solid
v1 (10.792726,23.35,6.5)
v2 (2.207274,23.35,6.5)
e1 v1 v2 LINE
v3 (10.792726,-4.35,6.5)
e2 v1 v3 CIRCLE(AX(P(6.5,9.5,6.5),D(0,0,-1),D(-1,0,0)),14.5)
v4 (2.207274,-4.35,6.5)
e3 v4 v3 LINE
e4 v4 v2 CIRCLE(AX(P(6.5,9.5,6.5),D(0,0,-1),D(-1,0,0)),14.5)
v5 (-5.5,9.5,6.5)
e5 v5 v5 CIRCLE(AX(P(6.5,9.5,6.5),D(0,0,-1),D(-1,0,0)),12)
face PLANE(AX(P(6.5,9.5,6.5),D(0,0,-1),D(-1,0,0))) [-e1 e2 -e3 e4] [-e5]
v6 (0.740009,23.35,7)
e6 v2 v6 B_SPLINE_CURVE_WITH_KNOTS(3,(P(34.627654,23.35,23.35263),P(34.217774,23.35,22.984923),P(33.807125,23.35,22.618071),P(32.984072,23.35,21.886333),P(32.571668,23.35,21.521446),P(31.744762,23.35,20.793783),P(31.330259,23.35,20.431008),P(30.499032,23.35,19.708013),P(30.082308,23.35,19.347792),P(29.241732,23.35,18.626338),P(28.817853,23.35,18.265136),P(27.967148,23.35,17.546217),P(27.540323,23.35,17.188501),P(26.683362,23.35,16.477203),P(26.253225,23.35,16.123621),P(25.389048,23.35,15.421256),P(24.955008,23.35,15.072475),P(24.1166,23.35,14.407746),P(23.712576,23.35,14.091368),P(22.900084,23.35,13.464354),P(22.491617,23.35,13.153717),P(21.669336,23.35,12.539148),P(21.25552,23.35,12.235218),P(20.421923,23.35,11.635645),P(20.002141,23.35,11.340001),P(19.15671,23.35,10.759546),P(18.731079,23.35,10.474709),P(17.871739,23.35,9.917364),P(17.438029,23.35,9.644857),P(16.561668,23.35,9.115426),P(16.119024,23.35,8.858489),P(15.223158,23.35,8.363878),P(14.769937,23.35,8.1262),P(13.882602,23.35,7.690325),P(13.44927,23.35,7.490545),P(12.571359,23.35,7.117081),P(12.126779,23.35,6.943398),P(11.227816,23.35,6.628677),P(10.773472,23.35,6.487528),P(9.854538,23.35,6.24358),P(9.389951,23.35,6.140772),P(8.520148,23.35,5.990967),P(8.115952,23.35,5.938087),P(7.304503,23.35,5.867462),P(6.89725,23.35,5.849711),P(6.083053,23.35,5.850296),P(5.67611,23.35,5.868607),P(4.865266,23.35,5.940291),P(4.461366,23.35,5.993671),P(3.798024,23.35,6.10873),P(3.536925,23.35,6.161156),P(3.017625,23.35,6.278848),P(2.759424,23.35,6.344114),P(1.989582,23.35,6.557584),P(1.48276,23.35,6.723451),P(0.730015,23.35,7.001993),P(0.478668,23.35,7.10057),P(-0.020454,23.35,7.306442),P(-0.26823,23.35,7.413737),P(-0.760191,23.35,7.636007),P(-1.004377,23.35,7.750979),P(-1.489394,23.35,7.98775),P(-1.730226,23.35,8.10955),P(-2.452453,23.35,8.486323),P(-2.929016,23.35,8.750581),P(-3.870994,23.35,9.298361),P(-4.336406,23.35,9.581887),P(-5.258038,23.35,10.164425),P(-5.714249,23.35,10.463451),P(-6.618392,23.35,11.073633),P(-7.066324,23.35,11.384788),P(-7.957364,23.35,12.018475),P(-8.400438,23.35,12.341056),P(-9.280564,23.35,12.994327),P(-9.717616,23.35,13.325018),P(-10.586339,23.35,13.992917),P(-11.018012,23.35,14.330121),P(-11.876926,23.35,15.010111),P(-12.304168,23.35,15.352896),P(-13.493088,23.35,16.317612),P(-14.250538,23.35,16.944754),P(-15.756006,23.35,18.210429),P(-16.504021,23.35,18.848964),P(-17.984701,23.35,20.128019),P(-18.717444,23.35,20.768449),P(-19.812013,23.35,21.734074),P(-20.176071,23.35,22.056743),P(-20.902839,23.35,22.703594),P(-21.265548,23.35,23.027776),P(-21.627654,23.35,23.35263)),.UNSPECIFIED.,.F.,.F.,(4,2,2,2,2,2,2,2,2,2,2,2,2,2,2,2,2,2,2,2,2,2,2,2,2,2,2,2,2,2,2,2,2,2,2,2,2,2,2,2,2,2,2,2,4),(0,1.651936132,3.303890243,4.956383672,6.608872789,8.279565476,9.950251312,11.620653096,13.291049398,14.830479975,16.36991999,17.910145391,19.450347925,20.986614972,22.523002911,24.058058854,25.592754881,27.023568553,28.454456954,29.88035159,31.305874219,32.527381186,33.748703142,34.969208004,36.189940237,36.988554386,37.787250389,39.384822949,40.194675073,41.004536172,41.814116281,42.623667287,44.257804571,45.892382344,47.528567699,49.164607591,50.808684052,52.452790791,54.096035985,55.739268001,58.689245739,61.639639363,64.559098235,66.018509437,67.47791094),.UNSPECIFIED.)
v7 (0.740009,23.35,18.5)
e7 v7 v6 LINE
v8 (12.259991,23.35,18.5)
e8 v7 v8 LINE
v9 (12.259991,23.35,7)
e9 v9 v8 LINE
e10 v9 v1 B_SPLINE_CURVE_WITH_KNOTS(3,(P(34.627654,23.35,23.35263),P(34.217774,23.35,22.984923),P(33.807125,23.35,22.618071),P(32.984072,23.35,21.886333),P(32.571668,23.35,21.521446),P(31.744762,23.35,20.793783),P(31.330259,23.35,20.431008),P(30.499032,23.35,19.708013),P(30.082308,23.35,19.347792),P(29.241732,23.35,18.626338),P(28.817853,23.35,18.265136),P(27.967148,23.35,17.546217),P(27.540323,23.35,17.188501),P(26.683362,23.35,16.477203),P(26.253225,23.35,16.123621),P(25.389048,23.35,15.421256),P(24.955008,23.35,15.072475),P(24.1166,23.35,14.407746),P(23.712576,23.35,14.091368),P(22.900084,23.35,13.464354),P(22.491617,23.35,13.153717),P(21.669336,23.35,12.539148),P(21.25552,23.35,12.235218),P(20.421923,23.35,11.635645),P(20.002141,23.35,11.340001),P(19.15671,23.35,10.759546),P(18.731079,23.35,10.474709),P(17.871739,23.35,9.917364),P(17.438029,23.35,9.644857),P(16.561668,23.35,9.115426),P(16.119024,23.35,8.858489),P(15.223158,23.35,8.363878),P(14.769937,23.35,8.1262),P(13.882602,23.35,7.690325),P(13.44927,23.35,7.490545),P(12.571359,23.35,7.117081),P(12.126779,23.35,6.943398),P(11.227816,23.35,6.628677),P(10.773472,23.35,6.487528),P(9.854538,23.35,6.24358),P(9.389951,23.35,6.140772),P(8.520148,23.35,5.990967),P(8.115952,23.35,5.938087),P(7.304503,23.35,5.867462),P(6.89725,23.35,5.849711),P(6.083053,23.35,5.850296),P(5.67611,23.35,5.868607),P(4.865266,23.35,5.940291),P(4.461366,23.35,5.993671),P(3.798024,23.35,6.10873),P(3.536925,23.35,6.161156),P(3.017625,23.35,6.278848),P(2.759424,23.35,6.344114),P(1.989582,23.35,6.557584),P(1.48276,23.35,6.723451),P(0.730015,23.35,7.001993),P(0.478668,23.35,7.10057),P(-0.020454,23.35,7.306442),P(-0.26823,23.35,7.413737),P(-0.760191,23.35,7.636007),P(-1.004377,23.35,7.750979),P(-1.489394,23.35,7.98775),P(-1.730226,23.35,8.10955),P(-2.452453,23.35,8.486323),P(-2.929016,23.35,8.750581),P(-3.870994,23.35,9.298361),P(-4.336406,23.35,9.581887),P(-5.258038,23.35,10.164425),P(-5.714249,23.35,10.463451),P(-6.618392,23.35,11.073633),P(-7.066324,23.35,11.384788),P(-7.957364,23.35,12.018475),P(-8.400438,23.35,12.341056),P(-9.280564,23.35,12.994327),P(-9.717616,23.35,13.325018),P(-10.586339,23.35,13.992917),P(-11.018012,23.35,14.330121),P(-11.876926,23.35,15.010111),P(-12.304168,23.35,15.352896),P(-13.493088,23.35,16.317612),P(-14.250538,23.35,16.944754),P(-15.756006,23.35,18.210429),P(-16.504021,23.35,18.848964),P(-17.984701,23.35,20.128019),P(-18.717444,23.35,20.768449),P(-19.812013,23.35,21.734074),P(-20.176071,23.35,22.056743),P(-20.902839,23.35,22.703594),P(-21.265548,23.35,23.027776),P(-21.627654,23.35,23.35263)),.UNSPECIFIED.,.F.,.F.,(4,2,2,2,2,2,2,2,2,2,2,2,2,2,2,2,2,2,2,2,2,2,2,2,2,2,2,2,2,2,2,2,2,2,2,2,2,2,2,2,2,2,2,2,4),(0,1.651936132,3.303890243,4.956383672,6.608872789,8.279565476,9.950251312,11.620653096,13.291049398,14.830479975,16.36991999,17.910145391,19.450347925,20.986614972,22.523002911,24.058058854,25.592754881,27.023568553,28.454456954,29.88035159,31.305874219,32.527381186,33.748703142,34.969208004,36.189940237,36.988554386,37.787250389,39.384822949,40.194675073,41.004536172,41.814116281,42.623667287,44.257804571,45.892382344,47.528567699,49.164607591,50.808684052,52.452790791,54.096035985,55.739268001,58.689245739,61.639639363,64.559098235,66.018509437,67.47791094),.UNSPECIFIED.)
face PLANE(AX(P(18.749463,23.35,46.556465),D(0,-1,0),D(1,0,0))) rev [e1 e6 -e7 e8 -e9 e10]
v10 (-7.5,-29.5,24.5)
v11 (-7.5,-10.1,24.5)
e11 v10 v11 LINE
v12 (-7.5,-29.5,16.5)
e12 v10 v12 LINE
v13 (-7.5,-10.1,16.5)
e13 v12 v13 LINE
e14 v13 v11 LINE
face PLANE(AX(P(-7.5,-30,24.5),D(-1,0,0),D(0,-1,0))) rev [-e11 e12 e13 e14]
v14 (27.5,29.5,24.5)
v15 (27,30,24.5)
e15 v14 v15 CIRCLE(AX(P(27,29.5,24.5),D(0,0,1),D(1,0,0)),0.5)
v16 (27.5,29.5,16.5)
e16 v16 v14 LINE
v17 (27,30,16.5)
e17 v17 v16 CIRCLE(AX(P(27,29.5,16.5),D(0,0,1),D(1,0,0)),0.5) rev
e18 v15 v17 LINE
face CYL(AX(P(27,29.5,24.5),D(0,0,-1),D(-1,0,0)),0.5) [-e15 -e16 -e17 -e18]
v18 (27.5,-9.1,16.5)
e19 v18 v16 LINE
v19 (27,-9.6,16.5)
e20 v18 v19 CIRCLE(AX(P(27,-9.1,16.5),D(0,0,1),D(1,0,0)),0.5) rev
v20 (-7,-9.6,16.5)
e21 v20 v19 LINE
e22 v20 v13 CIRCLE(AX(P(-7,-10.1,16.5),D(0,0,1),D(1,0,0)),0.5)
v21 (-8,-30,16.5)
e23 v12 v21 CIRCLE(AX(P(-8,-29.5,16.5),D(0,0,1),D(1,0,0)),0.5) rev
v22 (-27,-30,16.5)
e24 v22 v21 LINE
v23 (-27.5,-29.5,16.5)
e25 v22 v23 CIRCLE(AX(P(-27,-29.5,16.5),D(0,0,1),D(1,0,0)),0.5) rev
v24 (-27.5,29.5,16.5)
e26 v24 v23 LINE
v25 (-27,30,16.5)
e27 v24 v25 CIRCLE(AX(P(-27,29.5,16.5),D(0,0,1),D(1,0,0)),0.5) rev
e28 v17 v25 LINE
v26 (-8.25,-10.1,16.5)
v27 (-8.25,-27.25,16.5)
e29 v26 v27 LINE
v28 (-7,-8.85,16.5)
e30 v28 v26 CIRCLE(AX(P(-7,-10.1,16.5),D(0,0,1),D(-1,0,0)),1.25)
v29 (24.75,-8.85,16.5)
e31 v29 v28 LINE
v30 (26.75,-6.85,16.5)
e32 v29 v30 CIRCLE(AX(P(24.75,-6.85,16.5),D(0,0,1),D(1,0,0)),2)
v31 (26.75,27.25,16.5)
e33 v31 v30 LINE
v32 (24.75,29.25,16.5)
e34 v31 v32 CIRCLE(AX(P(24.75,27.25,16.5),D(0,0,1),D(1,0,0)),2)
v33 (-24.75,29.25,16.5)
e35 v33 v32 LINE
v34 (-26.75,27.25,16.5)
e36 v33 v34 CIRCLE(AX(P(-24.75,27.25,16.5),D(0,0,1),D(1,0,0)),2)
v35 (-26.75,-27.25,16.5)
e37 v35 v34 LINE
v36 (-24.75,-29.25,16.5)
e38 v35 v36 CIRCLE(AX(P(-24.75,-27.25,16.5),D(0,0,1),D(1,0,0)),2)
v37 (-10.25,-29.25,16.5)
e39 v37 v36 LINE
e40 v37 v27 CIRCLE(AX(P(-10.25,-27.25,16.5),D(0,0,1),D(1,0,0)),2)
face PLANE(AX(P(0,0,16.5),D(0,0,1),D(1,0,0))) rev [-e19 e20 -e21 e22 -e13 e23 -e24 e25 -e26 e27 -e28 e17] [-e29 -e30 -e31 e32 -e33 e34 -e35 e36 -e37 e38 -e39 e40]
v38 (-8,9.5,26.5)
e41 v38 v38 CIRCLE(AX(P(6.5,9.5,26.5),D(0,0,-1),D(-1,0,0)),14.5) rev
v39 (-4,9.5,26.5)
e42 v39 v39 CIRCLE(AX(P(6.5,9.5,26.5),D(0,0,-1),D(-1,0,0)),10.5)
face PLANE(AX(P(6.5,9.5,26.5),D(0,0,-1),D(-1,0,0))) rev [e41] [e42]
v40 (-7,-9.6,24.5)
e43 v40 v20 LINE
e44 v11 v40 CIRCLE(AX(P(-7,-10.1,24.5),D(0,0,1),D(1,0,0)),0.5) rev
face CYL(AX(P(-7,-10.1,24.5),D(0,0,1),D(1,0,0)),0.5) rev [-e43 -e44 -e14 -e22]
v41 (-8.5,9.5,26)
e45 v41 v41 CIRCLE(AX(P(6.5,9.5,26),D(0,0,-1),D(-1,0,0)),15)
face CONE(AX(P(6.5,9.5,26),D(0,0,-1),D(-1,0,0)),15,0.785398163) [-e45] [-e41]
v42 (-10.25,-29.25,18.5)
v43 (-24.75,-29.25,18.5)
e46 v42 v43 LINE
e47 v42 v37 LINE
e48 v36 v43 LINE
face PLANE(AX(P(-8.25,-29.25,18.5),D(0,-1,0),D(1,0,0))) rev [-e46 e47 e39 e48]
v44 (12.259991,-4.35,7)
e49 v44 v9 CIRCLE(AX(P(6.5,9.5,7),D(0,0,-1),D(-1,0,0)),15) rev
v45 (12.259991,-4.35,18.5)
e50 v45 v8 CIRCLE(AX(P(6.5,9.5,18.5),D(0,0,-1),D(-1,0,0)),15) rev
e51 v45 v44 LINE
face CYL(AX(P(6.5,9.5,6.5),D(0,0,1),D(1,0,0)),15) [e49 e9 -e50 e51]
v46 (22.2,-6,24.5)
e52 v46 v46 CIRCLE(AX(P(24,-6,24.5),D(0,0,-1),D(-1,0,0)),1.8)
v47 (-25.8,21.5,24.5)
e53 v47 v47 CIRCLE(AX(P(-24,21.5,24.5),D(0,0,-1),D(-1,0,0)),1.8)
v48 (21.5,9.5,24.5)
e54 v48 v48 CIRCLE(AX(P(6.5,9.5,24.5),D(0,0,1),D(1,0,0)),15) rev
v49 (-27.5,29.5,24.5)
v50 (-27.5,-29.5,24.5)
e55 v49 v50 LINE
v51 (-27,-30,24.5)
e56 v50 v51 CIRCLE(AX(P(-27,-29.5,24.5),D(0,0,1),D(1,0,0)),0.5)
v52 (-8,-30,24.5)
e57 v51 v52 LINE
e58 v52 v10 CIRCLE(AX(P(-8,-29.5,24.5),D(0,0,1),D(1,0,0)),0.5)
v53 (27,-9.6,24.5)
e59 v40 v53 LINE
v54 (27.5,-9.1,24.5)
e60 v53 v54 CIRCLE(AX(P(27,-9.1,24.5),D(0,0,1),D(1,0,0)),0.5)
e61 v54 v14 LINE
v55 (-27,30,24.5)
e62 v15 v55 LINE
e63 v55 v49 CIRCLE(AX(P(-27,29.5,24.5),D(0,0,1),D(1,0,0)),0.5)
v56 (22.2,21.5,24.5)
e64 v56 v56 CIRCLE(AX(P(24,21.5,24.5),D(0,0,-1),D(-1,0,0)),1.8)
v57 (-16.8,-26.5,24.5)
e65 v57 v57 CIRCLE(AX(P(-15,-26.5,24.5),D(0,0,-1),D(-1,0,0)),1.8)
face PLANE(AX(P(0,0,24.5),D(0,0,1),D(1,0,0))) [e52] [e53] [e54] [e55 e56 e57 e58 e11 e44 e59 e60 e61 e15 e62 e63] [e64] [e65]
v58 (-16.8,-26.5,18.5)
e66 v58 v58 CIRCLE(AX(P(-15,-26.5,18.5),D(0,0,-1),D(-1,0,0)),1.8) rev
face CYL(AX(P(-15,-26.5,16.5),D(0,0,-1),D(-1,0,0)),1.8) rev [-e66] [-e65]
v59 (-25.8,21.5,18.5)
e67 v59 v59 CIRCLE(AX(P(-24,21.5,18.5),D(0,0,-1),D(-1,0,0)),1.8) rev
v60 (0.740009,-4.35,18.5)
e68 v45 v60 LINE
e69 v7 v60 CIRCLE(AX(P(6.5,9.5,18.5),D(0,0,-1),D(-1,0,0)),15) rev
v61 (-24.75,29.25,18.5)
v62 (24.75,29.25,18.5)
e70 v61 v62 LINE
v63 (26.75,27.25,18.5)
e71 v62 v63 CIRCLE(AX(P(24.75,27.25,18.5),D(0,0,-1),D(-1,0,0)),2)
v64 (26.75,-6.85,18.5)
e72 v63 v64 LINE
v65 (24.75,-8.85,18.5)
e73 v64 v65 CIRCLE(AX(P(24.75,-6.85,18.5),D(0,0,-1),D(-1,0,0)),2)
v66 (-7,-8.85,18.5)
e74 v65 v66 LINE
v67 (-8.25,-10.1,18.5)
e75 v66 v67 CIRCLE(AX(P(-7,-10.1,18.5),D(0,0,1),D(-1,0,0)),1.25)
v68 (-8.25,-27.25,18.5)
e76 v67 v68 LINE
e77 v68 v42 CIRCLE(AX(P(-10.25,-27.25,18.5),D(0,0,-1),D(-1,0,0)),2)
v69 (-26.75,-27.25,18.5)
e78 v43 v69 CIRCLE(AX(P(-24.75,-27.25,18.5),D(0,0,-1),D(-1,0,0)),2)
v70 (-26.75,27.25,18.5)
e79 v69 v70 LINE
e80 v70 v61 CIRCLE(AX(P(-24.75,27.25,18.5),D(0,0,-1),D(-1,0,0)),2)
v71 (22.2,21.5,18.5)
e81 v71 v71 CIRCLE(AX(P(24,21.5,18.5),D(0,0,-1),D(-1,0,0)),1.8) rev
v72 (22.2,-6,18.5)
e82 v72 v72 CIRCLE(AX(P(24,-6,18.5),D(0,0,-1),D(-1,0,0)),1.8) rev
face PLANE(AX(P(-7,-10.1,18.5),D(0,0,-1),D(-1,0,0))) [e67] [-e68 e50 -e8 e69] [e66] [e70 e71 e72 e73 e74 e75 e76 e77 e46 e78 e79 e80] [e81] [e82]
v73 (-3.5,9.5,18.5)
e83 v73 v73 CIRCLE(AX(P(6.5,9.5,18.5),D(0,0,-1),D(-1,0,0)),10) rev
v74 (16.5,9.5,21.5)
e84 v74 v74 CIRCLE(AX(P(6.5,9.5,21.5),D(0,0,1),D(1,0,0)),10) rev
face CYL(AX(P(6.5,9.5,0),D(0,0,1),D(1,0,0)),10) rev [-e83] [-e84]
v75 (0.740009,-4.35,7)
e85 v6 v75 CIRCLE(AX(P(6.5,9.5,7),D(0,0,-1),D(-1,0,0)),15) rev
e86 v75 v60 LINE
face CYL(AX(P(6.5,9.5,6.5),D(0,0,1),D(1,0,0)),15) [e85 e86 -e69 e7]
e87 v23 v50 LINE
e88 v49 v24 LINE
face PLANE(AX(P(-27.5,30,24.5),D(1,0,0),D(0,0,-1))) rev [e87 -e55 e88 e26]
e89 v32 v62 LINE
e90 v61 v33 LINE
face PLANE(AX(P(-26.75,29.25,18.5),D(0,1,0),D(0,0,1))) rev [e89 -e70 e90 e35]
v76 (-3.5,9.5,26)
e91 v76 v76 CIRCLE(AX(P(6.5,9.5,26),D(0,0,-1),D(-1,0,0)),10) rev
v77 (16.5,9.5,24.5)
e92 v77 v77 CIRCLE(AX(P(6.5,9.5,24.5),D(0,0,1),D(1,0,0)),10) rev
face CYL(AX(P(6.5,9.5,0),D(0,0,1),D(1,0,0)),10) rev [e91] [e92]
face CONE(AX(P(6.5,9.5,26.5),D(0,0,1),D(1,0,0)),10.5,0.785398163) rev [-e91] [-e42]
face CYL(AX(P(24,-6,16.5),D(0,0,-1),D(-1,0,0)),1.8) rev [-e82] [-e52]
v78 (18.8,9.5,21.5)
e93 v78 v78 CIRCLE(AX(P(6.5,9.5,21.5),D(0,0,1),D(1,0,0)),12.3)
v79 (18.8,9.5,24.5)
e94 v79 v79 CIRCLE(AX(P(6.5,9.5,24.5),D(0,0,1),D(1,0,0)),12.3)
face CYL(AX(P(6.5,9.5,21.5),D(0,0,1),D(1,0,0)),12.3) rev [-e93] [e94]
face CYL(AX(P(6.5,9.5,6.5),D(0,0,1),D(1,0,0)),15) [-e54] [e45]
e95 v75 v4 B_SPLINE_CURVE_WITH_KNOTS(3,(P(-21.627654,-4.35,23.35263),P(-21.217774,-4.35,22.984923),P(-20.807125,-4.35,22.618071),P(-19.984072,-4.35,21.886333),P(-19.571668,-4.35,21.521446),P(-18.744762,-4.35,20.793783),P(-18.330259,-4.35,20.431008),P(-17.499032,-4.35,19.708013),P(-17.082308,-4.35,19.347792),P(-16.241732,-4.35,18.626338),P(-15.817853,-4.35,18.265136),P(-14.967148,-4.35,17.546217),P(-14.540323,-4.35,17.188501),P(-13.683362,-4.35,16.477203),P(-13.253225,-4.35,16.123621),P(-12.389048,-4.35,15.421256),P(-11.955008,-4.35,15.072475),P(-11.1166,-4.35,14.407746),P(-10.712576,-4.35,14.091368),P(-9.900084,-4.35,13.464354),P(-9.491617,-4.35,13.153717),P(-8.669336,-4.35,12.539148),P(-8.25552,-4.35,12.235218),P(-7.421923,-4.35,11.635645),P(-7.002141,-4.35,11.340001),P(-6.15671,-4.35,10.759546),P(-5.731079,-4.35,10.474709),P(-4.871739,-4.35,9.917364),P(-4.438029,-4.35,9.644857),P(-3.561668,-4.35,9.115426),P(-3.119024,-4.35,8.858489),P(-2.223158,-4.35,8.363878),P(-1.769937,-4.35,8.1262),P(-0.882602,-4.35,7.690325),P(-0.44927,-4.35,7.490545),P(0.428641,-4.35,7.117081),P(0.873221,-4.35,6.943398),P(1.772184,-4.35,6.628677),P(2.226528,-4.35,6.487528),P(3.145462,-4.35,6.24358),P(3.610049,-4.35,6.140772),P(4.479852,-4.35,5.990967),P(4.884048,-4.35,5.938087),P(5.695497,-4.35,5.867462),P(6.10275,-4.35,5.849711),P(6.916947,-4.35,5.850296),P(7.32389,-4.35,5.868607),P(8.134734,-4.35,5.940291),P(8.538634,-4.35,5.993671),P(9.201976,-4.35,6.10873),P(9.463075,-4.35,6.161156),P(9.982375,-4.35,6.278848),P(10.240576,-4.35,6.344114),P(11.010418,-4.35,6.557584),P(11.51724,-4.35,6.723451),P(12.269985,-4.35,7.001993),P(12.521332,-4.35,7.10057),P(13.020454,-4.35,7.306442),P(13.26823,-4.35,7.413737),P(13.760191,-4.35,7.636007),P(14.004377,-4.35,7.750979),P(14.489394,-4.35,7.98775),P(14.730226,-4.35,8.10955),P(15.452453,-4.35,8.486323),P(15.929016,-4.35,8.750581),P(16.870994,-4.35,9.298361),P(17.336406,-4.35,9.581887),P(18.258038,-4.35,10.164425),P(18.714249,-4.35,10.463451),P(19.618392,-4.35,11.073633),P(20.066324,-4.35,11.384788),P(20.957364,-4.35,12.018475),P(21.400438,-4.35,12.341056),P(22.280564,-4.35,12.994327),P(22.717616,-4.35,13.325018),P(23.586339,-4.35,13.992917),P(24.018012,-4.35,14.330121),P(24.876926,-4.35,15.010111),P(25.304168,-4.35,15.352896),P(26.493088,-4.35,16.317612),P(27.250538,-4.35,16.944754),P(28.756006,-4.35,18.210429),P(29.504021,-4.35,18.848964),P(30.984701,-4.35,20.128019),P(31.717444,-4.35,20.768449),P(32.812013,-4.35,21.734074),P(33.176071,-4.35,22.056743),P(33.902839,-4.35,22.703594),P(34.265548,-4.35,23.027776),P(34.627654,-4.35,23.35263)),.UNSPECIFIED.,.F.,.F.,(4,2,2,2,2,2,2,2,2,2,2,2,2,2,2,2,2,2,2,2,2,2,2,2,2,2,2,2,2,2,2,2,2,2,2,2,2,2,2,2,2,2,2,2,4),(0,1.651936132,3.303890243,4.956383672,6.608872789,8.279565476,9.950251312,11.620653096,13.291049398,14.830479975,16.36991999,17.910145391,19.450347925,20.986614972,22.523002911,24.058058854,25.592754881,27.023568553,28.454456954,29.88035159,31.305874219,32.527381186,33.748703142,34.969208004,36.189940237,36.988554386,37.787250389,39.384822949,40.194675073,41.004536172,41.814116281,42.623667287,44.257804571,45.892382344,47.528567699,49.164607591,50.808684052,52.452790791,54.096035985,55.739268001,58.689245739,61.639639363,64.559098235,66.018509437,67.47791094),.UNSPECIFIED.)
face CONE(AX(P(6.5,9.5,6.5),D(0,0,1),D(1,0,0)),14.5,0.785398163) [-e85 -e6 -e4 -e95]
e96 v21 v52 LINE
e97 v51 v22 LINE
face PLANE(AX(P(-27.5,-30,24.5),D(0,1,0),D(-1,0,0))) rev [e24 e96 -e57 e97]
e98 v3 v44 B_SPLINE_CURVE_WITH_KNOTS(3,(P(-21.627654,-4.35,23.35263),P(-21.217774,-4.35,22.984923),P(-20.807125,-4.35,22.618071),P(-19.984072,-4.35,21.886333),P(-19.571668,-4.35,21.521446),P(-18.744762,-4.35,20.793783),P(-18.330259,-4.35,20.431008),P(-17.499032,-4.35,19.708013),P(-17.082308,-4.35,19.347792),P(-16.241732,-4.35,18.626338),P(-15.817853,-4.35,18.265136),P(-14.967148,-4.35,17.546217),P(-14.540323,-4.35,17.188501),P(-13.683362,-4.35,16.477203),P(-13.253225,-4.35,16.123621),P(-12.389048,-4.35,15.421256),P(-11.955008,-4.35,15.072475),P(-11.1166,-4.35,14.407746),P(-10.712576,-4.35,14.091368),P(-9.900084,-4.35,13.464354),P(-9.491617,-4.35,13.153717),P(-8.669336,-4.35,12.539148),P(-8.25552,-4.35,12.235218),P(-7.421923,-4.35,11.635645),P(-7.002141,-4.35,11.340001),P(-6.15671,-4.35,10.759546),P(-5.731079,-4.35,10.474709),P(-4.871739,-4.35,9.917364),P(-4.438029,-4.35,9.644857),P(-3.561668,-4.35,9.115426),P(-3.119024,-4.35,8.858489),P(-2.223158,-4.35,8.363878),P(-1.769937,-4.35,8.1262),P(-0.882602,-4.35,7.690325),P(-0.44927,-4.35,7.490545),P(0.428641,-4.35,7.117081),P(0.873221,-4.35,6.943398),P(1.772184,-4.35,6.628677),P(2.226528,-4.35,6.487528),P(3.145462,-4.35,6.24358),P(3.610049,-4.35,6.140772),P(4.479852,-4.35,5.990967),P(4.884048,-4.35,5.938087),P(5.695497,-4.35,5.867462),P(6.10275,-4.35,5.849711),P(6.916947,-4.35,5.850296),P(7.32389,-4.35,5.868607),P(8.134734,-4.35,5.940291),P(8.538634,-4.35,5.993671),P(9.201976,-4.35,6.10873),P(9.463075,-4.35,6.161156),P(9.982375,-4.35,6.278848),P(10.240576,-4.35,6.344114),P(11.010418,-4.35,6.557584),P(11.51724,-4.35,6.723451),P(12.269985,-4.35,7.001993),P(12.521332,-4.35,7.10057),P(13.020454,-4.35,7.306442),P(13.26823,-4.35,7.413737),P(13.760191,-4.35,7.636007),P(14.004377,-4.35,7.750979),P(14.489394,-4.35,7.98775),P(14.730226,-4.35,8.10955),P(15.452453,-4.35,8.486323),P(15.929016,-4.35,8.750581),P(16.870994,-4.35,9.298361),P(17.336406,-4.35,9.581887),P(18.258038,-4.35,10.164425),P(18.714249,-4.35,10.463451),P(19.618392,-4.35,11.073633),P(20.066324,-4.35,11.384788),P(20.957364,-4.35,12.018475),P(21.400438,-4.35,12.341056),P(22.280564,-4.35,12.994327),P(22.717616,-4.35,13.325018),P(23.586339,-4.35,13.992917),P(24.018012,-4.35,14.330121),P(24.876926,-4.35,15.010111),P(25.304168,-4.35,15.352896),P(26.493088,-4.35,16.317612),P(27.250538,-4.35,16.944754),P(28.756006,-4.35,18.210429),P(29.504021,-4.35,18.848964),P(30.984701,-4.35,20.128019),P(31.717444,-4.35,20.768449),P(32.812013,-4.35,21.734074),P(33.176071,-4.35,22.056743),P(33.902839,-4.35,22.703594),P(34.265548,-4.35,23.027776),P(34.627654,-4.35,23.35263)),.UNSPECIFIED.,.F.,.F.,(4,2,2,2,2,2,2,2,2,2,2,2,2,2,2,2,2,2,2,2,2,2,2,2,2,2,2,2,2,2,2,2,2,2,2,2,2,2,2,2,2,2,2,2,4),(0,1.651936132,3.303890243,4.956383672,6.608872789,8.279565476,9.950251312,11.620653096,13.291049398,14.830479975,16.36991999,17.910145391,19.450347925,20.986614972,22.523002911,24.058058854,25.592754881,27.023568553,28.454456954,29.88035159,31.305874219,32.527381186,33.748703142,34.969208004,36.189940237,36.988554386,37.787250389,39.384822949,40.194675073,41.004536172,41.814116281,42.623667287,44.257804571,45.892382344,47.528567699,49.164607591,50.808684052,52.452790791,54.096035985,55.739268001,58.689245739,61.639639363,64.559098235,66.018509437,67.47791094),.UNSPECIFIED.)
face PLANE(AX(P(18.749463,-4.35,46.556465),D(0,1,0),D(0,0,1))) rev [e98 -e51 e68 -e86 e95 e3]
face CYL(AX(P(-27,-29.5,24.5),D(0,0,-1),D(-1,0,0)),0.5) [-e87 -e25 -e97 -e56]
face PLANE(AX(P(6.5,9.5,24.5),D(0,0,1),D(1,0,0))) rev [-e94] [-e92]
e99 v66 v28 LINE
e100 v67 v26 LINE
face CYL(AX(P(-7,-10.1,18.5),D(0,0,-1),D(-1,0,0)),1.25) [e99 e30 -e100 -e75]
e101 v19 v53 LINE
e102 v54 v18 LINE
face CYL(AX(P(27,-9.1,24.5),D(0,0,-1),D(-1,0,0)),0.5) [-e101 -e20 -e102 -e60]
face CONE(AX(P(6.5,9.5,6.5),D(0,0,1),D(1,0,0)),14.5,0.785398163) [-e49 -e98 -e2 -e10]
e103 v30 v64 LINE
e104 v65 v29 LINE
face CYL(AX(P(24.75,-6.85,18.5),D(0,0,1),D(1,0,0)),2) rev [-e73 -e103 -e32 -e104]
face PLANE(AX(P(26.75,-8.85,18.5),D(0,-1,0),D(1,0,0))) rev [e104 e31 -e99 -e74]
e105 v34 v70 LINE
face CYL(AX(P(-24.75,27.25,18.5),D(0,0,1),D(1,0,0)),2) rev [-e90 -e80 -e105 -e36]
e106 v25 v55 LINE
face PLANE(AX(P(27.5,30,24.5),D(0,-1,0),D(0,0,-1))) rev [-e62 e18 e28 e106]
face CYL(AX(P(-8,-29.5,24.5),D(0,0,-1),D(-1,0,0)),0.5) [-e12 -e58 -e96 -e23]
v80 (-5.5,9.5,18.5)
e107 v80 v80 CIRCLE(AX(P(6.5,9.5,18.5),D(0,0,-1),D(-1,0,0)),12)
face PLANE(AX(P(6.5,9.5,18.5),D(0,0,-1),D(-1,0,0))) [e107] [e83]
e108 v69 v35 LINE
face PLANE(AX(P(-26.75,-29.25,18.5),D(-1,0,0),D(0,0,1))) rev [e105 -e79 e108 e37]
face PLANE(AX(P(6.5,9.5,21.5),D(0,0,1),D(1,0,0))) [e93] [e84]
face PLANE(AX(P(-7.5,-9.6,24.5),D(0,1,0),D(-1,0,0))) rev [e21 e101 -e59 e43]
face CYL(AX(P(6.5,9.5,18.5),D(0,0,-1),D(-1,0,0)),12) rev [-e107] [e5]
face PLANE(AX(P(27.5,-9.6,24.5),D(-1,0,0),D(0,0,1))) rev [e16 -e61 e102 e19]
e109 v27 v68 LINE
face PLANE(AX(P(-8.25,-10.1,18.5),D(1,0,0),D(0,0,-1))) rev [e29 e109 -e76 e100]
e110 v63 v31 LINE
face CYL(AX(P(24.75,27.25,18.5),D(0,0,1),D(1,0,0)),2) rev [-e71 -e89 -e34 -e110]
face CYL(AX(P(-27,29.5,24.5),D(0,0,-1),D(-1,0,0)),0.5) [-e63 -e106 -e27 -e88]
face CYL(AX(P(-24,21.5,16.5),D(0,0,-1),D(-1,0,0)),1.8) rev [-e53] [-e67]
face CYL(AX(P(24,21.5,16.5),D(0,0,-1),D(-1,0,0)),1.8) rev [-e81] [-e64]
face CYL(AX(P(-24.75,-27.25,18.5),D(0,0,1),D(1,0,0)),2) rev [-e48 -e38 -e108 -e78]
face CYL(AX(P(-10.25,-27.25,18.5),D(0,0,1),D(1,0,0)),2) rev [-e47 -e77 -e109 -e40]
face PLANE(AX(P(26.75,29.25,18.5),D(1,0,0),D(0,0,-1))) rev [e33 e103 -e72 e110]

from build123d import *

# Parameters (mm, degrees)
SKETCH_1_W                       = 55
SKETCH_1_H                       = 60
EXTRUDE_1_DEPTH                  = 16.5
HOLE_WIZARD_3_6_3_6_1_D          = 3.6
HOLE_WIZARD_3_6_3_6_1_DEPTH      = 25
HOLE_WIZARD_3_6_3_6_1_TIP        = 1.081549114
HOLE_WIZARD_M2_5_1_D             = 2.05
HOLE_WIZARD_M2_5_1_DEPTH         = 14
HOLE_WIZARD_M2_5_1_TIP           = 0.615882135
SKETCH_8_W                       = 35
SKETCH_8_H                       = 20.4
CUT_EXTRUDE_1_DEPTH              = 44.914690025
CUT_EXTRUDE_START                = 2.5
SKETCH_9_W                       = 20
SKETCH_9_H                       = 6
CUT_EXTRUDE_2_DEPTH              = 42.414690025
SHELL_START                      = 1.8
SHELL_1_DEPTH                    = 14.7
EXTRUDE_2_DEPTH                  = 8
SKETCH_16_R                      = 3
CUT_EXTRUDE_4_DEPTH              = 12
CUT_EXTRUDE_5_DEPTH              = 47.599785407
CUT_EXTRUDE_5_DEPTH_BACK         = 47.599785407
SKETCH_17_R                      = 10
FILLET_1_R                       = 0.5
FILLET_2_R                       = 0.5
SKETCH_20_W                      = 1.8
SKETCH_20_H                      = 8
HOLE_WIZARD_3_6_3_6_2_AT_2_COUNT = 2
HOLE_WIZARD_3_6_3_6_2_AT_2_PITCH = 27.5
HOLE_WIZARD_3_6_3_6_2_AT_3_COUNT = 2
HOLE_WIZARD_3_6_3_6_2_AT_3_PITCH = 61.846584384
HOLE_WIZARD_3_6_3_6_2_AT_4_COUNT = 2
HOLE_WIZARD_3_6_3_6_2_AT_4_PITCH = 48
CUT_EXTRUDE_6_DEPTH              = 2
FILLET_3_R                       = 2
EXTRUDE_START                    = -8
SKETCH_24_R                      = 15
SKETCH_24_R_2                    = 10
EXTRUDE_3_DEPTH                  = 20
CHAMFER_1_SIZE                   = 0.5
CUT_EXTRUDE_START_2              = -2
SKETCH_25_R                      = 12.3
CUT_EXTRUDE_7_DEPTH              = 3
SKETCH_26_R                      = 12
CUT_EXTRUDE_8_DEPTH              = 12
SKETCH_27_W                      = 27.90091823
SKETCH_27_H                      = 2.950248151
CUT_EXTRUDE_9_DEPTH              = 12


# Read off the part's stored shape, not the designer's step: 抽壳1
with BuildPart() as part:
    # 草图1 → 凸台-拉伸1 (new body)
    with BuildSketch(Plane.XY):
        Rectangle(SKETCH_1_W, SKETCH_1_H)
    extrude(amount=EXTRUDE_1_DEPTH)

    # Ø3.6 (3.6) 直径孔1
    with Locations(Plane.XY.offset(16.5)):
        with Locations((-24, 21.5), (24, 21.5), (24, -6), (-15, -26.5)):
            Hole(HOLE_WIZARD_3_6_3_6_1_D / 2, depth=HOLE_WIZARD_3_6_3_6_1_DEPTH)
            with Locations((0, 0, -(HOLE_WIZARD_3_6_3_6_1_DEPTH + HOLE_WIZARD_3_6_3_6_1_TIP / 2))):  # 118° drill point
                Cone(0, HOLE_WIZARD_3_6_3_6_1_D / 2, HOLE_WIZARD_3_6_3_6_1_TIP, mode=Mode.SUBTRACT)

    # M2.5 螺纹孔1
    with Locations(Plane.XY.offset(16.5)):
        with Locations((-24, 26.5), (24, 26.5), (24, -1), (-22.5, -26.5)):
            Hole(HOLE_WIZARD_M2_5_1_D / 2, depth=HOLE_WIZARD_M2_5_1_DEPTH)
            with Locations((0, 0, -(HOLE_WIZARD_M2_5_1_DEPTH + HOLE_WIZARD_M2_5_1_TIP / 2))):  # 118° drill point
                Cone(0, HOLE_WIZARD_M2_5_1_D / 2, HOLE_WIZARD_M2_5_1_TIP, mode=Mode.SUBTRACT)

    # 草图8 → 切除-拉伸1 (cut, through all)
    with BuildSketch(Plane.XY.offset(16.5)):
        with Locations((10, -19.8)):
            Rectangle(SKETCH_8_W, SKETCH_8_H)
    extrude(amount=-CUT_EXTRUDE_1_DEPTH, mode=Mode.SUBTRACT)

    # 草图9 → 切除-拉伸2 (cut, through all)
    with BuildSketch(Plane(origin=(0, 0, 16.5), x_dir=(-1, 0, 0), z_dir=(0, 0, -1)).offset(CUT_EXTRUDE_START)):
        with Locations((17.5, -27)):
            Rectangle(SKETCH_9_W, SKETCH_9_H)
    extrude(amount=CUT_EXTRUDE_2_DEPTH, mode=Mode.SUBTRACT)

    # 抽壳1 outline → 抽壳1 (cut)
    with BuildSketch(Plane.XY.offset(SHELL_START)):
        with BuildLine():
            ThreePointArc((-21.743758657, 28.2), (-21.182110509, 26.299690696), (-22.006919283, 24.4979375))
            ThreePointArc((-22.006919283, 24.4979375), (-20.910890356, 19.651378458), (-25.7, 18.326673669))
            Line((-25.7, 18.326673669), (-25.7, -22.2))
            Line((-25.7, -22.2), (-9.3, -22.2))
            Line((-9.3, -22.2), (-9.3, -7.8))
            Line((-9.3, -7.8), (20.882308546, -7.8))
            ThreePointArc((20.882308546, -7.8), (20.494996561, -5.178446051), (22.006919283, -3.0020625))
            ThreePointArc((22.006919283, -3.0020625), (21.865811165, 0.8509087), (25.7, 1.256241343))
            Line((25.7, 1.256241343), (25.7, 18.326673669))
            ThreePointArc((25.7, 18.326673669), (20.910890356, 19.651378458), (22.006919283, 24.4979375))
            ThreePointArc((22.006919283, 24.4979375), (21.182110509, 26.299690696), (21.743758657, 28.2))
            Line((21.743758657, 28.2), (-21.743758657, 28.2))
        make_face()
    extrude(amount=SHELL_1_DEPTH, mode=Mode.SUBTRACT)

    # 草图16 → 切除-拉伸4 (cut)
    with BuildSketch(Plane(origin=(-7.5, 0, 0), x_dir=(0, 0, -1), z_dir=(1, 0, 0))):
        with Locations(Location((-8, -18, 0), (0, 0, 90))):
            Circle(SKETCH_16_R)
    extrude(amount=-CUT_EXTRUDE_4_DEPTH, mode=Mode.SUBTRACT)


with BuildPart() as body_2:
    # 草图10 → 凸台-拉伸2 (new body)
    with BuildSketch(Plane.XY.offset(16.5)):
        Polygon((-27.5, -30), (-7.5, -30), (-7.5, -9.6), (27.5, -9.6), (27.5, 30), (-27.5, 30), align=None)
    extrude(amount=EXTRUDE_2_DEPTH)


with BuildPart() as cut_extrude_5_tool:
    # 草图17 → 切除-拉伸5 (new, two sides: drawn at the far end of the back side and taken through both)
    with BuildSketch(Plane.XY.offset(1.8).offset(-CUT_EXTRUDE_5_DEPTH_BACK)):
        with Locations((6.5, 9.5)):
            Circle(SKETCH_17_R)
    extrude(amount=CUT_EXTRUDE_5_DEPTH + CUT_EXTRUDE_5_DEPTH_BACK)


with BuildPart() as part_1:
    add(part.part)

    # 切除-拉伸5: cut by cut_extrude_5_tool
    add(cut_extrude_5_tool.part, mode=Mode.SUBTRACT)

    # 圆角1
    fillet_1_edges = [part_1.edges().sort_by_distance(p)[0] for p in [
        (-27.5, 3, 0),
        (0, 30, 0),
        (27.5, 10.2, 0),
        (27.5, -9.6, 8.25),
        (-7.5, -16.8, 0),
        (10, -9.6, 0),
        (-7.5, -9.6, 8.25),
        (-7.5, -30, 15.25),
        (-27.5, -30, 15.25),
        (-27.5, 30, 8.25),
        (27.5, 30, 8.25),
        (-17.5, -24, 0),
        (-7.5, -24, 7),
        (-27.5, -24, 7),
    ]]
    fillet(fillet_1_edges, radius=FILLET_1_R)


with BuildPart() as body_2_1:
    add(body_2.part)

    # 切除-拉伸5: cut by cut_extrude_5_tool
    add(cut_extrude_5_tool.part, mode=Mode.SUBTRACT)

    # 圆角2
    fillet_2_edges = [body_2_1.edges().sort_by_distance(p)[0] for p in [
        (-27.5, 30, 20.5),
        (27.5, 30, 20.5),
        (27.5, -9.6, 20.5),
        (-7.5, -9.6, 20.5),
        (-7.5, -30, 20.5),
        (-27.5, -30, 20.5),
    ]]
    fillet(fillet_2_edges, radius=FILLET_2_R)

    # 草图20 → Ø3.6 (3.6) 直径孔2 (revolve, cut)
    with BuildSketch(Plane(origin=(24, 21.5, 16.5), x_dir=(0, 1, 0), z_dir=(1, 0, 0))):
        with Locations((0.9, 4)):
            Rectangle(SKETCH_20_W, SKETCH_20_H)
    hole_wizard_3_6_3_6_2 = revolve(axis=Axis((24, 21.5, 10.15), (0, 0, 1)), mode=Mode.SUBTRACT)

    # Ø3.6 (3.6) 直径孔2 at 2: Ø3.6 (3.6) 直径孔2 ×2
    with Locations(*[(0, -i * HOLE_WIZARD_3_6_3_6_2_AT_2_PITCH, 0) for i in range(1, HOLE_WIZARD_3_6_3_6_2_AT_2_COUNT)]):
        add(hole_wizard_3_6_3_6_2, mode=Mode.SUBTRACT)

    # Ø3.6 (3.6) 直径孔2 at 3: Ø3.6 (3.6) 直径孔2 ×2
    with Locations(*[Vector(-0.6305926250944656, -0.7761140001162656, 0) * (i * HOLE_WIZARD_3_6_3_6_2_AT_3_PITCH) for i in range(1, HOLE_WIZARD_3_6_3_6_2_AT_3_COUNT)]):
        add(hole_wizard_3_6_3_6_2, mode=Mode.SUBTRACT)

    # Ø3.6 (3.6) 直径孔2 at 4: Ø3.6 (3.6) 直径孔2 ×2
    with Locations(*[(-i * HOLE_WIZARD_3_6_3_6_2_AT_4_PITCH, 0, 0) for i in range(1, HOLE_WIZARD_3_6_3_6_2_AT_4_COUNT)]):
        add(hole_wizard_3_6_3_6_2, mode=Mode.SUBTRACT)

    # 草图23 → 切除-拉伸6 (cut)
    with BuildSketch(Plane(origin=(0, 0, 16.5), x_dir=(-1, 0, 0), z_dir=(0, 0, -1))):
        with BuildLine():
            Line((8.25, -10.1), (8.25, -29.25))
            Line((8.25, -29.25), (26.75, -29.25))
            Line((26.75, -29.25), (26.75, 29.25))
            Line((26.75, 29.25), (-26.75, 29.25))
            Line((-26.75, 29.25), (-26.75, -8.85))
            Line((-26.75, -8.85), (7, -8.85))
            ThreePointArc((7, -8.85), (7.883883476, -9.216116524), (8.25, -10.1))
        make_face()
    extrude(amount=-CUT_EXTRUDE_6_DEPTH, mode=Mode.SUBTRACT)

    # 圆角3
    fillet_3_edges = [body_2_1.edges().sort_by_distance(p)[0] for p in [
        (26.75, -8.85, 17.5),
        (26.75, 29.25, 17.5),
        (-26.75, 29.25, 17.5),
        (-26.75, -29.25, 17.5),
        (-8.25, -29.25, 17.5),
    ]]
    fillet(fillet_3_edges, radius=FILLET_3_R)

    # 草图24 → 凸台-拉伸3 (add)
    with BuildSketch(Plane(origin=(0, 0, 18.5), x_dir=(-1, 0, 0), z_dir=(0, 0, -1)).offset(EXTRUDE_START)):
        with Locations((-6.5, 9.5)):
            Circle(SKETCH_24_R)
        with Locations((-6.5, 9.5)):
            Circle(SKETCH_24_R_2, mode=Mode.SUBTRACT)
    extrude(amount=EXTRUDE_3_DEPTH)

    # 倒角1
    chamfer_1_edges = [body_2_1.edges().sort_by_distance(p)[0] for p in [
        (21.5, 9.5, 26.5),
        (21.5, 9.5, 6.5),
        (16.5, 9.5, 26.5),
    ]]
    chamfer(chamfer_1_edges, length=CHAMFER_1_SIZE)

    # 草图25 → 切除-拉伸7 (cut)
    with BuildSketch(Plane.XY.offset(26.5).offset(CUT_EXTRUDE_START_2)):
        with Locations((6.5, 9.5)):
            Circle(SKETCH_25_R)
    extrude(amount=-CUT_EXTRUDE_7_DEPTH, mode=Mode.SUBTRACT)

    # 草图26 → 切除-拉伸8 (cut)
    with BuildSketch(Plane(origin=(0, 0, 6.5), x_dir=(-1, 0, 0), z_dir=(0, 0, -1))):
        with Locations((-6.5, 9.5)):
            Circle(SKETCH_26_R)
    extrude(amount=-CUT_EXTRUDE_8_DEPTH, mode=Mode.SUBTRACT)

    # 草图27 → 切除-拉伸9 (cut)
    with BuildSketch(Plane(origin=(0, 0, 6.5), x_dir=(-1, 0, 0), z_dir=(0, 0, -1))):
        with Locations((-4.79900427, -5.825124076)):
            Rectangle(SKETCH_27_W, SKETCH_27_H)
        with Locations((-4.79900427, 24.825124075)):
            Rectangle(SKETCH_27_W, SKETCH_27_H)
    extrude(amount=-CUT_EXTRUDE_9_DEPTH, mode=Mode.SUBTRACT)


solid = body_2_1.part
